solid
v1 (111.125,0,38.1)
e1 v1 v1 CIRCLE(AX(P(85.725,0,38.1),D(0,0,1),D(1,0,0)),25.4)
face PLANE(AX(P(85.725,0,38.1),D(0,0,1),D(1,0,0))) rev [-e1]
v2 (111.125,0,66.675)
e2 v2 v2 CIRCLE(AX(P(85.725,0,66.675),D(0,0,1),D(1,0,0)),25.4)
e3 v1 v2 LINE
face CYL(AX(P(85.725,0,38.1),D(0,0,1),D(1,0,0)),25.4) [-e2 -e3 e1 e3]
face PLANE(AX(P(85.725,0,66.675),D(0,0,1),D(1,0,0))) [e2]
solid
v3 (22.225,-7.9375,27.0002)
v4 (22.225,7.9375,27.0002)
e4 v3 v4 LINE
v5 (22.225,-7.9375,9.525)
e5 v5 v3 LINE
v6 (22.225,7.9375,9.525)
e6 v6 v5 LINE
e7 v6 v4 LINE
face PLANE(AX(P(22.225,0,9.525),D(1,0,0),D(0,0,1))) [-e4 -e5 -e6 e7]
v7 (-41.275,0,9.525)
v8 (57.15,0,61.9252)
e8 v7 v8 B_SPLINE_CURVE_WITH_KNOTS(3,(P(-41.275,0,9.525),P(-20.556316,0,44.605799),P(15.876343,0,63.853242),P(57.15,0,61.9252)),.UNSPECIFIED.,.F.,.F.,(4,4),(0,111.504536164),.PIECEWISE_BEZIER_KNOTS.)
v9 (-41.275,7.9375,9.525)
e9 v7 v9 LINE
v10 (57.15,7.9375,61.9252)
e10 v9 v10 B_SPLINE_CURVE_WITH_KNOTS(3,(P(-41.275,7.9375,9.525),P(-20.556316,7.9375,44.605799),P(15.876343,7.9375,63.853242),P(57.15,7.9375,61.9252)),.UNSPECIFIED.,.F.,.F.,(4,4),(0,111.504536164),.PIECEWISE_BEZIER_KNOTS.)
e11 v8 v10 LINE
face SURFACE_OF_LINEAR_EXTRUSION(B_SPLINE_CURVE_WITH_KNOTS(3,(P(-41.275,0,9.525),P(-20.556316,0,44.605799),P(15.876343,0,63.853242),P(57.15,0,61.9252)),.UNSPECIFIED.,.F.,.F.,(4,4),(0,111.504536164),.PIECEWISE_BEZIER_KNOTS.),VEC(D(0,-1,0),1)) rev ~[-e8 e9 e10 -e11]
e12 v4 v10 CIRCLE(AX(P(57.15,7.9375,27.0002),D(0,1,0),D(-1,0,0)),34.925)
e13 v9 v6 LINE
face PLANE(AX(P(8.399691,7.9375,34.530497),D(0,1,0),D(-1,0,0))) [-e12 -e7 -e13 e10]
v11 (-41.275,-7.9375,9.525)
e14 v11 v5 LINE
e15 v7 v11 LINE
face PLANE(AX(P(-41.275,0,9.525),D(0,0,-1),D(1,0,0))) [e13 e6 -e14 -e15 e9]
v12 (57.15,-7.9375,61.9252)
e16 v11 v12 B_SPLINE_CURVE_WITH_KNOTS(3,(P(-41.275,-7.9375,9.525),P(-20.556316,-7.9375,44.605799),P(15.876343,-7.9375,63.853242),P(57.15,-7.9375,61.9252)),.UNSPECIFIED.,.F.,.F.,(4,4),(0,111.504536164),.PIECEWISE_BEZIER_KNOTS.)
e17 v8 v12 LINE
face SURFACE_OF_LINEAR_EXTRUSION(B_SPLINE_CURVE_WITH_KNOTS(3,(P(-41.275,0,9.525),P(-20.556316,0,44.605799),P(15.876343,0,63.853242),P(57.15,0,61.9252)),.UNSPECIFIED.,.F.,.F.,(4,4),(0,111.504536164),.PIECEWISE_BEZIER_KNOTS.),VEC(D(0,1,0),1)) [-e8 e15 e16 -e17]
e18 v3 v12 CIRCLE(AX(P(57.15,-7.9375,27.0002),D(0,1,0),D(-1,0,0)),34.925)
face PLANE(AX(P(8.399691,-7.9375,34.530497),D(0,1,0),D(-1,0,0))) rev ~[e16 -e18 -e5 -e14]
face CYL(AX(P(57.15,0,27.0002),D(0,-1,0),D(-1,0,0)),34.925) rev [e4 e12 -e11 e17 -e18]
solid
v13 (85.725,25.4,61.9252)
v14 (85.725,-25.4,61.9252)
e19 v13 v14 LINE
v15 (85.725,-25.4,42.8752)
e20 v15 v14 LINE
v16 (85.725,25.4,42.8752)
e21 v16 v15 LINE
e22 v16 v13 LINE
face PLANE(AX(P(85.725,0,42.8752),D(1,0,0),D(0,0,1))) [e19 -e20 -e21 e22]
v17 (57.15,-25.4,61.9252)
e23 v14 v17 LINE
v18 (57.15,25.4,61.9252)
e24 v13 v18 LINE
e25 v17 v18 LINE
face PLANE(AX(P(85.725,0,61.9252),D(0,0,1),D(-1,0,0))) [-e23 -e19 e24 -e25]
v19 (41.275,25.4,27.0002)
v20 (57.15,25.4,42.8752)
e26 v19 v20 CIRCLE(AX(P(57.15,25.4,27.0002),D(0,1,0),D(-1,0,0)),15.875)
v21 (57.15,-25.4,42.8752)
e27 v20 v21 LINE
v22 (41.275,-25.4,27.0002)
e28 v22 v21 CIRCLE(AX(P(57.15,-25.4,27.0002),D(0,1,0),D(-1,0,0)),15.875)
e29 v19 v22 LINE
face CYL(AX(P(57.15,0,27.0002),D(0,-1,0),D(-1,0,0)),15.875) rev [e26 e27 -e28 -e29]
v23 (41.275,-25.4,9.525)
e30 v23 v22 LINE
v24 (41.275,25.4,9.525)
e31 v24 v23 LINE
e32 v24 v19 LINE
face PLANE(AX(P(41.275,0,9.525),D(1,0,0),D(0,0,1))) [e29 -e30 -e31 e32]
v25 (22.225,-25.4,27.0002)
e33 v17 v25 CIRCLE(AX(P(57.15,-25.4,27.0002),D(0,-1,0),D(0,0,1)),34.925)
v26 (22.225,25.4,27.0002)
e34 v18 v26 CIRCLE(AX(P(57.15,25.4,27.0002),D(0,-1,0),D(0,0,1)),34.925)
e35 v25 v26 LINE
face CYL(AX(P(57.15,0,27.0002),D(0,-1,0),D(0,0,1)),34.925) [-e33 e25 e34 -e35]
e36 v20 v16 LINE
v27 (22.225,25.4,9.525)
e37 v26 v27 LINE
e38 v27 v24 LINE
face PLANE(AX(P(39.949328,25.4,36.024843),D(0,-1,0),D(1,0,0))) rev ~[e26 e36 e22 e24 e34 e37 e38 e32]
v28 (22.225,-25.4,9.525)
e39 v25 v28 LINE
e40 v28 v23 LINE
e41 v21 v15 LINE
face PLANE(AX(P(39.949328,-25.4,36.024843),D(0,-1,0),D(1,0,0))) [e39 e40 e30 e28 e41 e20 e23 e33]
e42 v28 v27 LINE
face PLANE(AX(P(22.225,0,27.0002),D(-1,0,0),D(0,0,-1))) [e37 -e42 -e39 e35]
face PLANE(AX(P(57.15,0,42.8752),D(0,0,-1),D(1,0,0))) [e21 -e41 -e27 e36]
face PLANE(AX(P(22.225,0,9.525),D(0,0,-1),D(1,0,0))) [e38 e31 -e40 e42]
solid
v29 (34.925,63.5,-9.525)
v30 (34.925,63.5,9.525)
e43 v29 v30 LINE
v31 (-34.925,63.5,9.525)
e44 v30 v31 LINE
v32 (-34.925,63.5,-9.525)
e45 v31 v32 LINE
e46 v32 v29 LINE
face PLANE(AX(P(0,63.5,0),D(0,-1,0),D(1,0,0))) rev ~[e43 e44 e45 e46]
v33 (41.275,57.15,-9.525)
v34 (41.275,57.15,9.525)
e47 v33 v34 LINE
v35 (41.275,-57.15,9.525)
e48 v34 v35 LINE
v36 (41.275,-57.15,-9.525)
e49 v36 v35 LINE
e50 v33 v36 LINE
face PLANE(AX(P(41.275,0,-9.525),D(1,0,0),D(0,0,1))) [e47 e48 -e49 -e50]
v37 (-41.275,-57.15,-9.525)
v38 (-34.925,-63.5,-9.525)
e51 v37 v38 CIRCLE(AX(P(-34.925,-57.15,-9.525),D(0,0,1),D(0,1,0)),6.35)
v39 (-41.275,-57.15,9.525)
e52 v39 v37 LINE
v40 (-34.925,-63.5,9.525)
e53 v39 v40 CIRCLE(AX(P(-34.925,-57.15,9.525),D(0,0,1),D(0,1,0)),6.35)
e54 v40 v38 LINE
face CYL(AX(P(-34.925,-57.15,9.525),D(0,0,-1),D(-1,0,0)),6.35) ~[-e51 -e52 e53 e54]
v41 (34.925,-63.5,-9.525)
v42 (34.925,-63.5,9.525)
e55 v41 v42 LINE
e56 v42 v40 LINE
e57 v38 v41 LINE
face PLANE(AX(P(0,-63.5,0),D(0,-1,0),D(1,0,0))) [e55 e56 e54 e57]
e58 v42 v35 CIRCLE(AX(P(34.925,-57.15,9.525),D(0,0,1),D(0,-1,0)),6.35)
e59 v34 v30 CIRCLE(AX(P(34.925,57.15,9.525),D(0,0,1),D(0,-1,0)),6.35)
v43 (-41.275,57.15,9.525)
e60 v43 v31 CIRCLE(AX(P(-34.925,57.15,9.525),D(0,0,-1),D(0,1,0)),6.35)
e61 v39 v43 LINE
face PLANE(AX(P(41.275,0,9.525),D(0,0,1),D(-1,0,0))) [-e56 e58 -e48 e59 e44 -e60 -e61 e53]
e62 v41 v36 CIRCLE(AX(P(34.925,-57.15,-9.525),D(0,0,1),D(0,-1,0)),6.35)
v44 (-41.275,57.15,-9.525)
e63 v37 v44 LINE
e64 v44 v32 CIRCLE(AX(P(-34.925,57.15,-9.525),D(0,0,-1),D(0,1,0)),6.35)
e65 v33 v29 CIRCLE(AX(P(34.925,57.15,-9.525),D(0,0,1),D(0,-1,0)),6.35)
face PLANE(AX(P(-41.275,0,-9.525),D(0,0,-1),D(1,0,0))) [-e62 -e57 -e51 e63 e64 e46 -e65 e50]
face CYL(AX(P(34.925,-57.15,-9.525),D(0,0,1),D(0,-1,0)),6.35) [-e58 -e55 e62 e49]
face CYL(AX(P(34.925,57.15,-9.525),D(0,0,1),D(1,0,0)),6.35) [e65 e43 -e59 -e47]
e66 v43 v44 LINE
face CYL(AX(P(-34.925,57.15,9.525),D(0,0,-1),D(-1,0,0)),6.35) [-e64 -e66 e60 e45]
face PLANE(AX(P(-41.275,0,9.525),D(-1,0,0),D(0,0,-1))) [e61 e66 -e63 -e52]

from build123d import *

# Parameters (mm, degrees)
F1_DEPTH = 63.5
F0_W     = 25.4
F0_H     = 19.05
F2_DEPTH = 25.4
F3_DEPTH = 7.9375
F5_R     = 6.35


# Not quite as in the source:
# - a feature names something its author has since deleted; it is built from what else it names


with BuildPart() as f1:
    # F0 (on Front) → F1 (new body, symmetric)
    with BuildSketch(Plane.XZ):
        Polygon((-41.275, -9.525), (41.275, -9.525), (41.275, 9.525), (22.225, 9.525), (-41.275, 9.525), align=None)
    extrude(amount=F1_DEPTH, both=True)

    # F5
    f5_edges = [f1.edges().sort_by_distance(p)[0] for p in [
        (41.275, -63.5, 0),
        (-41.275, -63.5, 0),
        (41.275, 63.5, 0),
        (-41.275, 63.5, 0),
    ]]
    fillet(f5_edges, radius=F5_R)


with BuildPart() as f2:
    # F0 (on Front) → F2 (new body, symmetric)
    with BuildSketch(Plane.XZ):
        with BuildLine():
            Line((22.225, 9.525), (41.275, 9.525))
            Line((41.275, 9.525), (41.275, 27.0002))
            ThreePointArc((41.275, 27.0002), (45.9246798487, 38.2255201513), (57.15, 42.8752))
            Line((57.15, 42.8752), (60.325, 42.8752))
            Line((60.325, 42.8752), (60.325, 61.9252))
            Line((60.325, 61.9252), (57.15, 61.9252))
            ThreePointArc((57.15, 61.9252), (32.4542956671, 51.6959043329), (22.225, 27.0002))
            Line((22.225, 27.0002), (22.225, 9.525))
        make_face()
        with Locations((73.025, 52.4002)):
            Rectangle(F0_W, F0_H)
    extrude(amount=F2_DEPTH, both=True)


with BuildPart() as f3:
    # F0 (on Front) → F3 (new body, symmetric)
    with BuildSketch(Plane.XZ):
        with BuildLine():
            add(Edge.make_bspline(
                [(-41.275, 9.525), (-20.5563157797, 44.6057990193), (15.8763434738, 63.8532415032), (57.15, 61.9252)],
                knots=[0, 0, 0, 0, 111.5045361635, 111.5045361635, 111.5045361635, 111.5045361635], degree=3))
            Line((-41.275, 9.525), (22.225, 9.525))
            Line((22.225, 9.525), (22.225, 27.0002))
            ThreePointArc((22.225, 27.0002), (32.4542956671, 51.6959043329), (57.15, 61.9252))
        make_face()
    extrude(amount=F3_DEPTH, both=True)


with BuildPart() as f4:
    # F0 (on Front) → F4 (revolve)
    with BuildSketch(Plane.XZ):
        Polygon((85.725, 66.675), (85.725, 61.9252), (85.725, 42.8752), (85.725, 38.1), (111.125, 38.1), (111.125, 66.675), align=None)
    revolve(axis=Axis((85.725, 0, 52.3875), (0, 0, 1)))


solid = Compound([f1.part, f2.part, f3.part, f4.part])
